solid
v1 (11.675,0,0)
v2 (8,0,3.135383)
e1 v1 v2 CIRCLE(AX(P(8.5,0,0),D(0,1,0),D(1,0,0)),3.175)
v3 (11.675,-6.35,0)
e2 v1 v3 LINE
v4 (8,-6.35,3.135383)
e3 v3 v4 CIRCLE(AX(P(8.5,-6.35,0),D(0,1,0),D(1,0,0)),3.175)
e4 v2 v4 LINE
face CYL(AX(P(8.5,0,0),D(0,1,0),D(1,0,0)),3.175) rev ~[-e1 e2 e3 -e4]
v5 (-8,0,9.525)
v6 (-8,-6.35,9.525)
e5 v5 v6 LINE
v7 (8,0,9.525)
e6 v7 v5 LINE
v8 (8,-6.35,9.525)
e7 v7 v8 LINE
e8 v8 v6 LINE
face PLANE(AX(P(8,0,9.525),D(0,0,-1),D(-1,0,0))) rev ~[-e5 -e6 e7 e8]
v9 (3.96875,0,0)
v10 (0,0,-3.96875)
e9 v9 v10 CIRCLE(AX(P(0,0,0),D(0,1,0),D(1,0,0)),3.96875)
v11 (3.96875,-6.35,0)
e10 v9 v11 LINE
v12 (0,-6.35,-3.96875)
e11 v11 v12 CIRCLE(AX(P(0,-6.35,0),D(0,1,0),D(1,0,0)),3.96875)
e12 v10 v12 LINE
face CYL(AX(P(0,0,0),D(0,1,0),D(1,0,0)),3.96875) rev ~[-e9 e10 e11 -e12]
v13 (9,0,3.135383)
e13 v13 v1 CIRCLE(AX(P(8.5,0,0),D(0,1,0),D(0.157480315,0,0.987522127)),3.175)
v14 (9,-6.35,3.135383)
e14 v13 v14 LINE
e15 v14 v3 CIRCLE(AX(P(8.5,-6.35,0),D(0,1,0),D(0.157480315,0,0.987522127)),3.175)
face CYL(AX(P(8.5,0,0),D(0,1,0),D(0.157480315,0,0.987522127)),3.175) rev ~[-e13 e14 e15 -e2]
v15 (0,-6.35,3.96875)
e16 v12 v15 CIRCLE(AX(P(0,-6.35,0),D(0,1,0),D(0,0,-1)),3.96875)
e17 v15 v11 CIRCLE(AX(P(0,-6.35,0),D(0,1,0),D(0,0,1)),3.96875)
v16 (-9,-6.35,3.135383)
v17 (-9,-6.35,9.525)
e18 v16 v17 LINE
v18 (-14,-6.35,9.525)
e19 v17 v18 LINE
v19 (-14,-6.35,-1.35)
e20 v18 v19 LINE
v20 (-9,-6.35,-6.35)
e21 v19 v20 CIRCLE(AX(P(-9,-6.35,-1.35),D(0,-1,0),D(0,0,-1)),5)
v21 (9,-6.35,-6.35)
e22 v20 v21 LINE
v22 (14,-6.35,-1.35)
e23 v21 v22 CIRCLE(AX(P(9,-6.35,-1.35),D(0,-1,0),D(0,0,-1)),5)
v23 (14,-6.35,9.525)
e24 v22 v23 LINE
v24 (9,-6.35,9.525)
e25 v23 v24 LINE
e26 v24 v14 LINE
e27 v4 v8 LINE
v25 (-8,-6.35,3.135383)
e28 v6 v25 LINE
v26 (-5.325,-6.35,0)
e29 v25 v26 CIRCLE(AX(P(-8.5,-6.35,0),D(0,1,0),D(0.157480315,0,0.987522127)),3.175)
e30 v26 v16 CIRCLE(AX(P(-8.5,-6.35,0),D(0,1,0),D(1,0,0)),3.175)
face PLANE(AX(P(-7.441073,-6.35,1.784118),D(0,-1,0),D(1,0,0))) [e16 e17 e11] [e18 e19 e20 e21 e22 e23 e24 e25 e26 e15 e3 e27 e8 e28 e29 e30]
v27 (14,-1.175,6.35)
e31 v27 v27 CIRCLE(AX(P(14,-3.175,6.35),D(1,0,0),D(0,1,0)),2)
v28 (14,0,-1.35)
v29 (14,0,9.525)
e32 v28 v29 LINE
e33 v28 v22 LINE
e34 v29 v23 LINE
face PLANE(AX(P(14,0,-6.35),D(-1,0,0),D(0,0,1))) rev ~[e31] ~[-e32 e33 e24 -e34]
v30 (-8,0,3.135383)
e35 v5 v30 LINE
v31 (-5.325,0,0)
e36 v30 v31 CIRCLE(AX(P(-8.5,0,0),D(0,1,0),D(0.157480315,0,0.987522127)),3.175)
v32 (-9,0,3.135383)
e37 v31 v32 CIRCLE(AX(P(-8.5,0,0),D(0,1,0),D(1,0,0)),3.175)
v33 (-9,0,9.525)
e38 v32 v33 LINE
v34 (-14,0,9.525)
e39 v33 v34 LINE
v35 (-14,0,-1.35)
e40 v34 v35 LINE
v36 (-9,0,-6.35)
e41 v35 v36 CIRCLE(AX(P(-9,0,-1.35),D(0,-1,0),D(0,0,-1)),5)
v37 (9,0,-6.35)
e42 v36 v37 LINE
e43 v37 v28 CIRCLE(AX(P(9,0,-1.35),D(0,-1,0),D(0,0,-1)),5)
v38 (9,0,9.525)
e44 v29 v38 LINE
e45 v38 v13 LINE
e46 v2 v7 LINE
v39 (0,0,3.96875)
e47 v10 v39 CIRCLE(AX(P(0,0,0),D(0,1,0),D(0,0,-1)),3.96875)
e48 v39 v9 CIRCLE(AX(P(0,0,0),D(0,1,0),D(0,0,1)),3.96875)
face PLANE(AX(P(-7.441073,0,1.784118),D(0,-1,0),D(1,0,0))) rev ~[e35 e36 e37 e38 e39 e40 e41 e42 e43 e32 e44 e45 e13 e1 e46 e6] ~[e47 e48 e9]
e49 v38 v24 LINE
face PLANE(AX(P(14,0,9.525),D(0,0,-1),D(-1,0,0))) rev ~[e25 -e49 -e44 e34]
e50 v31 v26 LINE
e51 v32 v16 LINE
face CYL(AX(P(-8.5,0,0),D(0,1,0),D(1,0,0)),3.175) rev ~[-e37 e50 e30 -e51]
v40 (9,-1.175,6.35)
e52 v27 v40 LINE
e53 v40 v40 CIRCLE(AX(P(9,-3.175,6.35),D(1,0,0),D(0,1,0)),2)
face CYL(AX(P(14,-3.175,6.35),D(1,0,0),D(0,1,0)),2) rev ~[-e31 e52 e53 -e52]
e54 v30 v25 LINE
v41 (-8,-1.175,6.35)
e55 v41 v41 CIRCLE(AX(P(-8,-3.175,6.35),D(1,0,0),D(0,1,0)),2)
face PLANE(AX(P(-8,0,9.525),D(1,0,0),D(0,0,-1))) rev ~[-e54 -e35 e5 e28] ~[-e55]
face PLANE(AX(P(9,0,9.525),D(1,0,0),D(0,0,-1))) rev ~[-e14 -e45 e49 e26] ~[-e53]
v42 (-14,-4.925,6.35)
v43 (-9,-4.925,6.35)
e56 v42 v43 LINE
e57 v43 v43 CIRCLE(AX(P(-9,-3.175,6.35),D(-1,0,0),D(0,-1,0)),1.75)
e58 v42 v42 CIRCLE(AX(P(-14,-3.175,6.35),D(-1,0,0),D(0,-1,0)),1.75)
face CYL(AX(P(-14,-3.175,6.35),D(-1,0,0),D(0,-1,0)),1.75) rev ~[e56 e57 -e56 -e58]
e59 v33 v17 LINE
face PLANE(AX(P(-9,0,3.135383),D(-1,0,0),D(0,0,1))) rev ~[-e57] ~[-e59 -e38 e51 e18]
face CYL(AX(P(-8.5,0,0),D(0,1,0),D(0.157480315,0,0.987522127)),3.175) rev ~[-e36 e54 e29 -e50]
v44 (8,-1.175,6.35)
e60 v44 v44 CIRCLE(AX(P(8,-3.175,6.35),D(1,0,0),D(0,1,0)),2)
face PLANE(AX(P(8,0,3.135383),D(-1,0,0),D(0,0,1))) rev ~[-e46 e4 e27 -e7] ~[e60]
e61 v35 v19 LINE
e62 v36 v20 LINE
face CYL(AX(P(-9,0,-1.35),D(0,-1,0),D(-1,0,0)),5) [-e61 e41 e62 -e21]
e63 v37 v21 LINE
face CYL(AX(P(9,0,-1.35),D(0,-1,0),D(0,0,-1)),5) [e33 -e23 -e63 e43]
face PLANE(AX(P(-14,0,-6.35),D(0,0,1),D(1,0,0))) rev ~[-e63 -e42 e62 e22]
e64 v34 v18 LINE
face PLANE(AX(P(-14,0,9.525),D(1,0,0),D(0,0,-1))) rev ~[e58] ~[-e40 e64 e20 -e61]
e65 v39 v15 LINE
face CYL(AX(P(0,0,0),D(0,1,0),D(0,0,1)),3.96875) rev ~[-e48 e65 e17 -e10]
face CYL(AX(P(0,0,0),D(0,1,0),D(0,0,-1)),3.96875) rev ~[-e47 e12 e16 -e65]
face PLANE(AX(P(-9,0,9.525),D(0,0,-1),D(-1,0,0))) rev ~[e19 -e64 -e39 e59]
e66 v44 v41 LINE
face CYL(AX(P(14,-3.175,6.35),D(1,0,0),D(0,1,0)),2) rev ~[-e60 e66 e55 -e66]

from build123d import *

# Parameters (mm, degrees)
F1_DEPTH = 6.35
F2_R     = 2
F3_DEPTH = 22.5
F4_R     = 5
F5_R     = 1.75
F6_DEPTH = 28.001


# Not quite as in the source:
# - a feature names something its author has since deleted; it is built from what else it names


with BuildPart() as f1:
    # F0 (on Front) → F1 (new body)
    with BuildSketch(Plane.XZ):
        with BuildLine():
            ThreePointArc((0, -3.96875), (-3.96875, 0), (0, 3.96875))
            Line((0, 3.96875), (0, 9.525))
            Line((0, 9.525), (-8, 9.525))
            Line((-8, 9.525), (-8, 3.1353827518))
            ThreePointArc((-8, 3.1353827518), (-6.0846195952, 2.0607189279), (-5.325, 0))
            ThreePointArc((-5.325, 0), (-10.5607189279, -2.4153804048), (-9, 3.1353827518))
            Line((-9, 3.1353827518), (-9, 9.525))
            Line((-9, 9.525), (-14, 9.525))
            Line((-14, 9.525), (-14, -6.35))
            Line((-14, -6.35), (0, -6.35))
            Line((0, -6.35), (0, -3.96875))
        make_face()
        with BuildLine():
            ThreePointArc((0, 3.96875), (2.8063300378, 2.8063300378), (3.96875, 0))
            ThreePointArc((3.96875, 0), (2.8063300378, -2.8063300378), (0, -3.96875))
            Line((0, -3.96875), (0, -6.35))
            Line((0, -6.35), (14, -6.35))
            Line((14, -6.35), (14, 9.525))
            Line((14, 9.525), (9, 9.525))
            Line((9, 9.525), (9, 3.1353827518))
            ThreePointArc((9, 3.1353827518), (10.9153804048, 2.0607189279), (11.675, 0))
            ThreePointArc((11.675, 0), (6.4392810721, -2.4153804048), (8, 3.1353827518))
            Line((8, 3.1353827518), (8, 9.525))
            Line((8, 9.525), (0, 9.525))
            Line((0, 9.525), (0, 3.96875))
        make_face()
    extrude(amount=F1_DEPTH)

    # F2 (on face) → F3 (cut)
    with BuildSketch(Plane.YZ.offset(14)):
        with Locations((-3.175, 6.35)):
            Circle(F2_R)
    extrude(amount=-F3_DEPTH, mode=Mode.SUBTRACT)

    # F4
    f4_edges = [f1.edges().sort_by_distance(p)[0] for p in [
        (14, -3.175, -6.35),
        (-14, -3.175, -6.35),
    ]]
    fillet(f4_edges, radius=F4_R)

    # F5 (on face) → F6 (cut, through all)
    with BuildSketch(Plane(origin=(-14, 0, 0), x_dir=(0, -1, 0), z_dir=(-1, 0, 0))):
        with Locations((3.175, 6.35)):
            Circle(F5_R)
    extrude(amount=-F6_DEPTH, mode=Mode.SUBTRACT)


solid = f1.part
